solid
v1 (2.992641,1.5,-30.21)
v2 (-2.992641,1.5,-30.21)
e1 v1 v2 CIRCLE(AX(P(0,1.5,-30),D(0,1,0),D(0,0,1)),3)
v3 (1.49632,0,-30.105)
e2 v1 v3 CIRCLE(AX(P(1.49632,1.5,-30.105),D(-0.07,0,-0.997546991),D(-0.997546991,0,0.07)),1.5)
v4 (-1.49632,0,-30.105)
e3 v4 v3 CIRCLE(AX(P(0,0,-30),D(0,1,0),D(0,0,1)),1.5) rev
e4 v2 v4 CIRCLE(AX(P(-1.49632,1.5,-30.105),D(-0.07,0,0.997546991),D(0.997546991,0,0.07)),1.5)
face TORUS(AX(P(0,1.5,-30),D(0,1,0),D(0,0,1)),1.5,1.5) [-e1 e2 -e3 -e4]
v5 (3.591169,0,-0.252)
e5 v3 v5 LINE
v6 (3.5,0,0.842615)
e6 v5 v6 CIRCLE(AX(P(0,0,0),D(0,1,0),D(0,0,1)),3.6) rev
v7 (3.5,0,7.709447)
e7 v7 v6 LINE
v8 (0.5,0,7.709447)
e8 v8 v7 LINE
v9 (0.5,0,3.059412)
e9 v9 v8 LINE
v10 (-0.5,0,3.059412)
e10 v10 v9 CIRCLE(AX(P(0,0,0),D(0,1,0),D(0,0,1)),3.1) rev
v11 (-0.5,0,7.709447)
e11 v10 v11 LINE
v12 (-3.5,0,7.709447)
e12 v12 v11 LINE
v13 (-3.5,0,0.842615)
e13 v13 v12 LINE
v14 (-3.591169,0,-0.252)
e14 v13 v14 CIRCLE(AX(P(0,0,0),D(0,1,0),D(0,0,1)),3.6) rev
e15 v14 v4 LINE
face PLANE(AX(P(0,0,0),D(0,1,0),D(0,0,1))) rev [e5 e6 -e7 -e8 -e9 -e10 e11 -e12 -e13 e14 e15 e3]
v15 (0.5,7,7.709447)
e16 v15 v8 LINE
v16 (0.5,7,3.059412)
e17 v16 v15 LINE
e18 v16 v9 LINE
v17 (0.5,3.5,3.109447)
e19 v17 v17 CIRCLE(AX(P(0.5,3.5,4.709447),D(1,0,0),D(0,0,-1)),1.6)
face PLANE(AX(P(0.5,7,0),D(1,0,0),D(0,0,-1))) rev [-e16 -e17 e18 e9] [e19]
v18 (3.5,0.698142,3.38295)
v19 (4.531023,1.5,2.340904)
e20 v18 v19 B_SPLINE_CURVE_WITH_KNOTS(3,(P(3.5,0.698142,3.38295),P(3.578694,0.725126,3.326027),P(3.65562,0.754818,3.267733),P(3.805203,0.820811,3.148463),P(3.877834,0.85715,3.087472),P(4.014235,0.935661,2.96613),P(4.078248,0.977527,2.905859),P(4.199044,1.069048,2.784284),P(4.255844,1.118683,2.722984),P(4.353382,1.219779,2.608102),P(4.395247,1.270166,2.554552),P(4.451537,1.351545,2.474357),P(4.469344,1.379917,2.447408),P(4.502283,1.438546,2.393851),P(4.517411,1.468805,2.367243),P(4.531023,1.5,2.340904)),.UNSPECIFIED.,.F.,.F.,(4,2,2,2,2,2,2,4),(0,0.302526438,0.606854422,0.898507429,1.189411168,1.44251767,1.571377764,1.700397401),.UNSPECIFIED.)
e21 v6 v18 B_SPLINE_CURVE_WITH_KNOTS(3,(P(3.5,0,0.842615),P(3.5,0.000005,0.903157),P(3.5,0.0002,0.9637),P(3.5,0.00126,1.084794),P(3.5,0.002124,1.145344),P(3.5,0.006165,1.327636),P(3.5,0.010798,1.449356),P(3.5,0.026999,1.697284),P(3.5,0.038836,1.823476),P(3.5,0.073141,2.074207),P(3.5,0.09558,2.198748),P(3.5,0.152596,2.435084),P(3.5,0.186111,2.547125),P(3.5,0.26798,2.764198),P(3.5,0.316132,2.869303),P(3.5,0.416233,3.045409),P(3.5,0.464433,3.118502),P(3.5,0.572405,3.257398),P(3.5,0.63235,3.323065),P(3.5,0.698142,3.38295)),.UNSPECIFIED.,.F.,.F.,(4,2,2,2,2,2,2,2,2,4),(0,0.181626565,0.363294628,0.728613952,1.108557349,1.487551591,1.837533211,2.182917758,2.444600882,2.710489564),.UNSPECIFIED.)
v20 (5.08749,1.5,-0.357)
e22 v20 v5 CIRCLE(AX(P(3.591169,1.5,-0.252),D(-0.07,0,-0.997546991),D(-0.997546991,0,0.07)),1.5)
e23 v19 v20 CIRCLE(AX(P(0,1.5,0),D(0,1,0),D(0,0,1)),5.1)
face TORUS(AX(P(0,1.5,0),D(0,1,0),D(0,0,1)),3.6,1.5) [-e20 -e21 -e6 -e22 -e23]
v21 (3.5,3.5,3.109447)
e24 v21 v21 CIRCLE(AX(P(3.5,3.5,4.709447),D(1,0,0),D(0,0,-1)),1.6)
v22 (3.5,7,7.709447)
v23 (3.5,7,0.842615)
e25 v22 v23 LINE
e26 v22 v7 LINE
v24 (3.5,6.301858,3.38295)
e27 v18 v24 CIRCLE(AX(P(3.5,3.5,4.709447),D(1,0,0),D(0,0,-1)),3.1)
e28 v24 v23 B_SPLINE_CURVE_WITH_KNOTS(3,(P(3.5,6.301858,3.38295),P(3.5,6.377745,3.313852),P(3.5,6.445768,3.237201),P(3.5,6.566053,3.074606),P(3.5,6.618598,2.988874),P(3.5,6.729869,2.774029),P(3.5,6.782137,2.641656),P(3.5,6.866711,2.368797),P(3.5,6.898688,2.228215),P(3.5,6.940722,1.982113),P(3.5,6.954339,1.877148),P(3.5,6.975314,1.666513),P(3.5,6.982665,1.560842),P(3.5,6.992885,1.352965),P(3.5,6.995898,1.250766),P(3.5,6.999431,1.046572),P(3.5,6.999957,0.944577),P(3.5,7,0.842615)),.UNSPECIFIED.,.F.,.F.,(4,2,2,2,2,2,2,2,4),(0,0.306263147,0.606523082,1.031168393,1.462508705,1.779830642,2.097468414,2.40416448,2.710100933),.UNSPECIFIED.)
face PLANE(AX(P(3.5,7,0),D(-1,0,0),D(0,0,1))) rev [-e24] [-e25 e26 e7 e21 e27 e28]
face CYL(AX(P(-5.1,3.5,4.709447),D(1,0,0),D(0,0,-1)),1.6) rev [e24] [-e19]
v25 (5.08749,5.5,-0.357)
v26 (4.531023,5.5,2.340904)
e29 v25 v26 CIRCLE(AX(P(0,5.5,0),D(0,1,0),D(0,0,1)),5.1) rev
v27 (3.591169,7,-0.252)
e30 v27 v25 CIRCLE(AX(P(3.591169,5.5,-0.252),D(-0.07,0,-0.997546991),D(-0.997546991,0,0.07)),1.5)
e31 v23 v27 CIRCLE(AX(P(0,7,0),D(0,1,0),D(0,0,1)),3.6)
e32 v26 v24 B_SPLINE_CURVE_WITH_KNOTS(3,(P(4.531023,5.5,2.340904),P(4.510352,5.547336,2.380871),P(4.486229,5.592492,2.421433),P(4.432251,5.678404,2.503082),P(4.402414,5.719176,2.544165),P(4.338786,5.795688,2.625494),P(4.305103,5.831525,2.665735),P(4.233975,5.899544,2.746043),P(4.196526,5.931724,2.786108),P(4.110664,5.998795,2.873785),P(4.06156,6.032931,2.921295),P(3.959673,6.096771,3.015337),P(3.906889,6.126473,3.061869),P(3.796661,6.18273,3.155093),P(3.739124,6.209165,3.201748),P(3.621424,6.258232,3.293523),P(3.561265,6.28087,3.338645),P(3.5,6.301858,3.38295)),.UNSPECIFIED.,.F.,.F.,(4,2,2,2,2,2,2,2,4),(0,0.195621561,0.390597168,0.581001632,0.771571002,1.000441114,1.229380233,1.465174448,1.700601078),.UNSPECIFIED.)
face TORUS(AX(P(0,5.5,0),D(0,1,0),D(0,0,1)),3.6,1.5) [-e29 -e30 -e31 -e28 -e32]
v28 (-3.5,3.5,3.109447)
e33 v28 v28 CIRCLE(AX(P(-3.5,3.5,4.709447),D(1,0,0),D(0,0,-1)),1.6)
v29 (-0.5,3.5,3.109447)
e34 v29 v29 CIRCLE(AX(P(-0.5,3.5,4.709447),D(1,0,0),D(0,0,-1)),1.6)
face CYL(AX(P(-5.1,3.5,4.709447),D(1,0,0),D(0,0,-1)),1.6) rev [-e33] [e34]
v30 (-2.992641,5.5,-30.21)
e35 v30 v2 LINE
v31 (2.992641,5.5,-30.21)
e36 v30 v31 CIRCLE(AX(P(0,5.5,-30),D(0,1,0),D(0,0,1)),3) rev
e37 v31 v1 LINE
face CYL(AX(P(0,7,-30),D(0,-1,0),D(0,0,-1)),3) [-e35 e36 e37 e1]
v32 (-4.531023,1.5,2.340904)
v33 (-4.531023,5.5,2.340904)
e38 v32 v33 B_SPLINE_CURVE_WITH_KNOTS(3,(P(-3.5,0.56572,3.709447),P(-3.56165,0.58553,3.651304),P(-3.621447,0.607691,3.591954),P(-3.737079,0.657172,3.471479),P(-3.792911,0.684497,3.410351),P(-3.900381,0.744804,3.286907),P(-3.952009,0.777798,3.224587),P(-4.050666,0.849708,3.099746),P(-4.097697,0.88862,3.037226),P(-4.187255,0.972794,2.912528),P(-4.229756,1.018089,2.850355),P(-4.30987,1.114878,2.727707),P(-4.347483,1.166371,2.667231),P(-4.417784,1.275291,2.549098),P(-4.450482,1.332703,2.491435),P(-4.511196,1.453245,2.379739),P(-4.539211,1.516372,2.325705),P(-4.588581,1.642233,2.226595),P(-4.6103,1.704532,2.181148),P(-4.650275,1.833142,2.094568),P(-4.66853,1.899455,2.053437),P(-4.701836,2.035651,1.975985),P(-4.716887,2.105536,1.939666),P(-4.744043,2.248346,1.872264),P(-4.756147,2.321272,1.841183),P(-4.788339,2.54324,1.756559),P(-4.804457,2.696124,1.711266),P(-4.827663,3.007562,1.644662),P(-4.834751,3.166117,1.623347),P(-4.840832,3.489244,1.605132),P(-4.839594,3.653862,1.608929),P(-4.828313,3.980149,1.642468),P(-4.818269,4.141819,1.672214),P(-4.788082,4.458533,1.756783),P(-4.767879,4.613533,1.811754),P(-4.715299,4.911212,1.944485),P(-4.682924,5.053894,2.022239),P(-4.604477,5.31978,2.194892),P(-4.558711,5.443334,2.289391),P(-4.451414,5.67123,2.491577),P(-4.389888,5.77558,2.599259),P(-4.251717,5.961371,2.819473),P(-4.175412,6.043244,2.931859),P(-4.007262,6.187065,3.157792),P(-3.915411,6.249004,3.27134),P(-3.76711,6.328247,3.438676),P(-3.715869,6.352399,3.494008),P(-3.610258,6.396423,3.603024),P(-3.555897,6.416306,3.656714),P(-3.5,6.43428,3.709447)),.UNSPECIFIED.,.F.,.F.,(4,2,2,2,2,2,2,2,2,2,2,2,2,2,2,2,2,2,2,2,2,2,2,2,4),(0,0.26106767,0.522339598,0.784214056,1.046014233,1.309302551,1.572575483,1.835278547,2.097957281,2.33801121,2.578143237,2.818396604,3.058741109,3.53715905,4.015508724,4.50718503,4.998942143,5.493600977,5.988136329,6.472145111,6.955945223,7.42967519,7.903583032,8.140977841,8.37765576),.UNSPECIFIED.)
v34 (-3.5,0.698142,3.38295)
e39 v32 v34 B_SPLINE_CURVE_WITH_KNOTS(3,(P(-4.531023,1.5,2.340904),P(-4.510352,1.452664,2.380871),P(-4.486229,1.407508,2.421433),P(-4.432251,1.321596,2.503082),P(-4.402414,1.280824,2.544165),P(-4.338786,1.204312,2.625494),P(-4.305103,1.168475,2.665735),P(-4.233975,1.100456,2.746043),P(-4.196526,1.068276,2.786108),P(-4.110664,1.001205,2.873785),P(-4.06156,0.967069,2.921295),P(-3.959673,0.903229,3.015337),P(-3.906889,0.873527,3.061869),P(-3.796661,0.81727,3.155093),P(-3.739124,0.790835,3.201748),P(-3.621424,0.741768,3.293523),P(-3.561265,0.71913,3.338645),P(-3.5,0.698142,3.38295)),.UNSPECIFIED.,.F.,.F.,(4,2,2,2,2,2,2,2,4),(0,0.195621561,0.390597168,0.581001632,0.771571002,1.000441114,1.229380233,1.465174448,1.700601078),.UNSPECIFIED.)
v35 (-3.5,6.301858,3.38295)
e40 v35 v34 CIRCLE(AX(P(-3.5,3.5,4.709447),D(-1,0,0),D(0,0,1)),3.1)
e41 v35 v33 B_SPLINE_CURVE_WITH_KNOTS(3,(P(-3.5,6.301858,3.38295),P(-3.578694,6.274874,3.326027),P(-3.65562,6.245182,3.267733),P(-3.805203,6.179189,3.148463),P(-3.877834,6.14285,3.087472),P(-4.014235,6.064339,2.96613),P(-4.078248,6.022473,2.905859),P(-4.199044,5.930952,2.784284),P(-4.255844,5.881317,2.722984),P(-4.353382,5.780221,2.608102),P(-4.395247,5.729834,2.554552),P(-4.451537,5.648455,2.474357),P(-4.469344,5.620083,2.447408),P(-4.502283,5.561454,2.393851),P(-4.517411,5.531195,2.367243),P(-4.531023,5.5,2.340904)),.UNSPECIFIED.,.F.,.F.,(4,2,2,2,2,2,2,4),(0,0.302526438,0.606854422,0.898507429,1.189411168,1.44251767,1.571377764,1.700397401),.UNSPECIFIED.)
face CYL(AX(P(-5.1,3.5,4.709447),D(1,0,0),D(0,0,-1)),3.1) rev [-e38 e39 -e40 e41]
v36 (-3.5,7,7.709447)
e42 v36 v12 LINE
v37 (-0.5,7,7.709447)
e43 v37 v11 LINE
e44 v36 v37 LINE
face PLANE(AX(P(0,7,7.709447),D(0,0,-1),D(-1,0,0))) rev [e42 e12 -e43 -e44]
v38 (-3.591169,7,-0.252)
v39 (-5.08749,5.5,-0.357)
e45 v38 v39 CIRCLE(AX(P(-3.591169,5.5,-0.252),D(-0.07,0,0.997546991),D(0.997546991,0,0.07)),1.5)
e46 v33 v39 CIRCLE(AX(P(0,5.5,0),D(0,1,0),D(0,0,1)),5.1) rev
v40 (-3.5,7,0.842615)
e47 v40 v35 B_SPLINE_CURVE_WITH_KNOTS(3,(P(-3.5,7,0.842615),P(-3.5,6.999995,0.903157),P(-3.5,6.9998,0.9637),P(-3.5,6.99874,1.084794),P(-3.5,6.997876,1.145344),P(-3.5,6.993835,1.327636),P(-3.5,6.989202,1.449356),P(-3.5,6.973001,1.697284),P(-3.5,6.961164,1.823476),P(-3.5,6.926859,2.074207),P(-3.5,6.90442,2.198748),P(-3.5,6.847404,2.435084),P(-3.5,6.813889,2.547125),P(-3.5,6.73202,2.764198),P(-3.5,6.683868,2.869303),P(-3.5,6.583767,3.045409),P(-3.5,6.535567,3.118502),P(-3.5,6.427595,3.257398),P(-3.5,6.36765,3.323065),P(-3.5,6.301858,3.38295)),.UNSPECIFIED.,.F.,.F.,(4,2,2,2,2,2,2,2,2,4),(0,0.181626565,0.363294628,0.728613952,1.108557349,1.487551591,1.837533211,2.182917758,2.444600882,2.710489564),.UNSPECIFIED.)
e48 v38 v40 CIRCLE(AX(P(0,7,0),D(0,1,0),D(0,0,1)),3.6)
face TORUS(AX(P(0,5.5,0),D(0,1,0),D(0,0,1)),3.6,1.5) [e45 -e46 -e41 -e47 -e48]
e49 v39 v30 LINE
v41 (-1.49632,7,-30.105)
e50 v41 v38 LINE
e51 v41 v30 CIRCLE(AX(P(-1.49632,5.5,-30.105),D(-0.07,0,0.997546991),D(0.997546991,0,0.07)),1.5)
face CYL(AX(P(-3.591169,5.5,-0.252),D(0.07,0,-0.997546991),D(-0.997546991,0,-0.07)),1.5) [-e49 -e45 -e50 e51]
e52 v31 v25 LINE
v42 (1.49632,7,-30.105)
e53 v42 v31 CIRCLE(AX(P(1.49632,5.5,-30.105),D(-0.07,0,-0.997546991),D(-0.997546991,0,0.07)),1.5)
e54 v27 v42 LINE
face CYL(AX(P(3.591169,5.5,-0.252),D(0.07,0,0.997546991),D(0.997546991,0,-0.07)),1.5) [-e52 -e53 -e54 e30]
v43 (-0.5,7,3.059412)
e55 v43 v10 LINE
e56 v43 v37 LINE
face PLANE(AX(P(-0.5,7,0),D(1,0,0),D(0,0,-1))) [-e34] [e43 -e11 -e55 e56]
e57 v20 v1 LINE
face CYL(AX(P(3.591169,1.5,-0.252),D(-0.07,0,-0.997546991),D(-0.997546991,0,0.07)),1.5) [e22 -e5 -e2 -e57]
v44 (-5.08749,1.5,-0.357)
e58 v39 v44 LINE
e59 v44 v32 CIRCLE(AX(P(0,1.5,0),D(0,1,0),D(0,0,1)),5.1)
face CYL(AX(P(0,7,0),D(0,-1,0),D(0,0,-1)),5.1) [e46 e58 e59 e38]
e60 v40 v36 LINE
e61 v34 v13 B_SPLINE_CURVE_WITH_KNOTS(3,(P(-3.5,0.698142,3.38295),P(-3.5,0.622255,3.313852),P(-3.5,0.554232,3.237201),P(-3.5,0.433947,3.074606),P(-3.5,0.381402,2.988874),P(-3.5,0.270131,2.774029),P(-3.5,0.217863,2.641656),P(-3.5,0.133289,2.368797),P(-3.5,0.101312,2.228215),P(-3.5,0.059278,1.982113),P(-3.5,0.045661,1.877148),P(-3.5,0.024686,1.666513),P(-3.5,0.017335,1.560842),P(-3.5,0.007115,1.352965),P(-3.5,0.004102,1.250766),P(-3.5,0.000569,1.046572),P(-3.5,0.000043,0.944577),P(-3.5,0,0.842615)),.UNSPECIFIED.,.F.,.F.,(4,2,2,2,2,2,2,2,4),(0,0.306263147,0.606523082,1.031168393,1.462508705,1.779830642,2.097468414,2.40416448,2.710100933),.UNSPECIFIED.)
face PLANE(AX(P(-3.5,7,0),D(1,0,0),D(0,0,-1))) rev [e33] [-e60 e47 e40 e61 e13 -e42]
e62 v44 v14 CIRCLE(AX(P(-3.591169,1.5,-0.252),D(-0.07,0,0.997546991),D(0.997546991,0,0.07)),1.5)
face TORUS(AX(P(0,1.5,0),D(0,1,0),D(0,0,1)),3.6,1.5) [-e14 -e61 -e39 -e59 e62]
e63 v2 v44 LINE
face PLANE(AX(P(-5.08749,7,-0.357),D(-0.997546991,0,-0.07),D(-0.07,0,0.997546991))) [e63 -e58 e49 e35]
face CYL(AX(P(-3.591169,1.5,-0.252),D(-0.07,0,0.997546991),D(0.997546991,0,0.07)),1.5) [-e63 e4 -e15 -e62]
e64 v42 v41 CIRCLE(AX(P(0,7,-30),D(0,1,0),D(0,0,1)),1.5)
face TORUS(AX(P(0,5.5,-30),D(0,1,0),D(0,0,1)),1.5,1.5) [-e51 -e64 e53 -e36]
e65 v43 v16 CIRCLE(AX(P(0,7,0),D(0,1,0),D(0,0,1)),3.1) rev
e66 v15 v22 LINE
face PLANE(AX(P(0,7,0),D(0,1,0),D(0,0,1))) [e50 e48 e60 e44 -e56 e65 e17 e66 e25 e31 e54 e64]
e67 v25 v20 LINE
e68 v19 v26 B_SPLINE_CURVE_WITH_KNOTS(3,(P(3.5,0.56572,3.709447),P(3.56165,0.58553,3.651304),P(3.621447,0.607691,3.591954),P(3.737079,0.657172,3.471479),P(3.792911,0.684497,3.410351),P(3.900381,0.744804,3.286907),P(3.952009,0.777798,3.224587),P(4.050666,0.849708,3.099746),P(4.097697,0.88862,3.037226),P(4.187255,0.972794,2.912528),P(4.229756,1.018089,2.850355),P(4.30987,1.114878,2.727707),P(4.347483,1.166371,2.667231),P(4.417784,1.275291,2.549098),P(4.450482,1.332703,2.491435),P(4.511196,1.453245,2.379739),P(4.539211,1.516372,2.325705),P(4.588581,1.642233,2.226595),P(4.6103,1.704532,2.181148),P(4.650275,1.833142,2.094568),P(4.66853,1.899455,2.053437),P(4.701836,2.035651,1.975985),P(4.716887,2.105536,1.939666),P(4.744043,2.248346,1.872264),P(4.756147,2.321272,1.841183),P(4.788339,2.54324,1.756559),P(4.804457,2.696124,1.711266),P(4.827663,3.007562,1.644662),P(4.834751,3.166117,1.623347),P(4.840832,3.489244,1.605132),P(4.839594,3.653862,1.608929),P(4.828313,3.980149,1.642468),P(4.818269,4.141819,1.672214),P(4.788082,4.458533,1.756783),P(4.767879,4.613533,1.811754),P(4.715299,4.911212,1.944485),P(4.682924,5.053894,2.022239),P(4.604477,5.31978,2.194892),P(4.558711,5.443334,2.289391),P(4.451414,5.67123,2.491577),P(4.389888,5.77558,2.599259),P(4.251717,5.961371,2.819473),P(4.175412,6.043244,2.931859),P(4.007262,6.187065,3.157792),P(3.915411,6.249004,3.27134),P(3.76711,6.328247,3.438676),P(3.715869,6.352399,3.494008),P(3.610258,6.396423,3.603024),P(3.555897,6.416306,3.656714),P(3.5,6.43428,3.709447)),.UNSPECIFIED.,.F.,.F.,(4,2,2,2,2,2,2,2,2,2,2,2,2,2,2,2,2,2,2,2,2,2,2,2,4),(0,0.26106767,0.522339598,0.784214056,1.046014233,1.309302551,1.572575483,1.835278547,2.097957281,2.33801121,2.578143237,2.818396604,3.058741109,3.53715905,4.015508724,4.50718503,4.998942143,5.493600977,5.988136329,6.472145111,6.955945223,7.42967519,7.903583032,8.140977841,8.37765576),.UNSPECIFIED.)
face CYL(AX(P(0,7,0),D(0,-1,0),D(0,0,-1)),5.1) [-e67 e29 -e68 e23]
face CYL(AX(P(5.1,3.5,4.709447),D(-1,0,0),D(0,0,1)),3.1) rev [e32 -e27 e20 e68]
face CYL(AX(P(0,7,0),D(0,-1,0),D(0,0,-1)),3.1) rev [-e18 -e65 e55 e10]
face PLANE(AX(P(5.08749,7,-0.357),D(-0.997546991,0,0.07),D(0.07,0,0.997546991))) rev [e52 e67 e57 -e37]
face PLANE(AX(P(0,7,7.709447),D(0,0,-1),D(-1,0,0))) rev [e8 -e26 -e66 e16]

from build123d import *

# Parameters (mm, degrees)
BOSS_EXTRUDE1_DEPTH = 7
SKETCH2_R           = 1.6
CUT_EXTRUDE1_DEPTH  = 35.813215881
SKETCH3_R           = 3.1
CUT_EXTRUDE2_DEPTH  = 35.813215926
SKETCH4_R           = 3.1
CUT_EXTRUDE3_DEPTH  = 35.813215926
FILLET1_R           = 1.5


with BuildPart() as part:
    # Sketch1 → Boss-Extrude1 (new body)
    with BuildSketch(Plane(origin=(0, 0, 0), x_dir=(1, 0, 0), z_dir=(0, 1, 0))):
        with BuildLine():
            Line((3.5, -7.709447398), (3.5, -3.709447398))
            ThreePointArc((3.5, -3.709447398), (4.75081501, -1.85465812), (5.087489656, 0.357))
            Line((5.087489656, 0.357), (2.992640974, 30.21))
            ThreePointArc((2.992640974, 30.21), (0, 33), (-2.992640974, 30.21))
            Line((-2.992640974, 30.21), (-5.087489656, 0.357))
            ThreePointArc((-5.087489656, 0.357), (-4.75081501, -1.85465812), (-3.5, -3.709447398))
            Line((-3.5, -3.709447398), (-3.5, -7.709447398))
            Line((-3.5, -7.709447398), (-0.5, -7.709447398))
            Line((-0.5, -7.709447398), (-0.5, -3.059411708))
            ThreePointArc((-0.5, -3.059411708), (0, 3.1), (0.5, -3.059411708))
            Line((0.5, -3.059411708), (0.5, -7.709447398))
            Line((0.5, -7.709447398), (3.5, -7.709447398))
        make_face()
    extrude(amount=BOSS_EXTRUDE1_DEPTH)

    # Sketch2 → Cut-Extrude1 (cut, through all)
    with BuildSketch(Plane(origin=(3.5, 0, 0), x_dir=(0, 0, -1), z_dir=(1, 0, 0))):
        with Locations((-4.709447398, 3.5)):
            Circle(SKETCH2_R)
    extrude(amount=-CUT_EXTRUDE1_DEPTH, mode=Mode.SUBTRACT)

    # Sketch3 → Cut-Extrude2 (cut, through all)
    with BuildSketch(Plane(origin=(3.5, 0, 0), x_dir=(0, 0, -1), z_dir=(1, 0, 0))):
        with Locations((-4.709447398, 3.5)):
            Circle(SKETCH3_R)
    extrude(amount=CUT_EXTRUDE2_DEPTH, mode=Mode.SUBTRACT)

    # Sketch4 → Cut-Extrude3 (cut, through all)
    with BuildSketch(Plane.ZY.offset(3.5)):
        with Locations((4.709447398, 3.5)):
            Circle(SKETCH4_R)
    extrude(amount=CUT_EXTRUDE3_DEPTH, mode=Mode.SUBTRACT)

    # Fillet1
    # the kernel refuses this fillet: 1.5 mm, written as the material it takes off along each edge
    with BuildSketch(Plane(origin=(0, 0, 0), x_dir=(-0.9975469913743412, 0, -0.06999999999999885), z_dir=(0.06999999999999885, 0, -0.9975469913743412))) as fillet1_piece_1_section:
        with BuildLine():
            CenterArc((5.1 - FILLET1_R, FILLET1_R), FILLET1_R, 270, 90)
            Line((5.1 - FILLET1_R, 0), (5.1, 0))
            Line((5.1, 0), (5.1, FILLET1_R))
        make_face()
    fillet1_piece_1 = revolve(axis=Axis((0, 0, 0), (0, 1, 0)), revolution_arc=92.812679078, mode=Mode.PRIVATE)
    fillet1_piece_1 = split(fillet1_piece_1, bisect_by=Plane(origin=(-3.5, 0.37107605, 1.567580694), z_dir=(-1, 0, 0)), keep=Keep.TOP, mode=Mode.PRIVATE)
    add(fillet1_piece_1, mode=Mode.SUBTRACT)
    with BuildSketch(Plane(origin=(0, 0, 0), x_dir=(0.020965246222385766, 0, 0.9997802050705118), z_dir=(-0.9997802050705118, 0, 0.020965246222385766))) as fillet1_piece_2_section:
        with BuildLine():
            CenterArc((5.1 - FILLET1_R, FILLET1_R), FILLET1_R, 270, 90)
            Line((5.1, FILLET1_R), (5.1, 0))
            Line((5.1, 0), (5.1 - FILLET1_R, 0))
        make_face()
    fillet1_piece_2 = revolve(axis=Axis((0, 0, 0), (0, 1, 0)), revolution_arc=92.812679078, mode=Mode.PRIVATE)
    fillet1_piece_2 = split(fillet1_piece_2, bisect_by=Plane(origin=(3.5, 0.371076241, 1.567580599), z_dir=(1, 0, 0)), keep=Keep.TOP, mode=Mode.PRIVATE)
    add(fillet1_piece_2, mode=Mode.SUBTRACT)
    with BuildSketch(Plane(origin=(5.087489656, 0, -0.357), x_dir=(0, 1, 0), z_dir=(-0.06999999999999998, 0, -0.9975469913743412)), Plane(origin=(-2.992640974, 0, -30.21), x_dir=(0, 1, 0), z_dir=(-0.06999999999999998, 0, 0.9975469913743412)), Plane(origin=(-2.992640974, 7, -30.21), x_dir=(0.9975469913743412, 0, 0.06999999999999998), z_dir=(-0.06999999999999998, 0, 0.9975469913743412))) as fillet1_piece_3:
        with BuildLine():
            CenterArc((FILLET1_R, -FILLET1_R), FILLET1_R, 90, 90)
            Line((0, -FILLET1_R), (0, 0))
            Line((0, 0), (FILLET1_R, 0))
        make_face()
    extrude(amount=29.926409741, mode=Mode.SUBTRACT)
    with BuildSketch(Plane(origin=(0, 0, -30), x_dir=(0.9975469913743412, 0, -0.07000000000000023), z_dir=(0.07000000000000023, 0, 0.9975469913743412))) as fillet1_piece_4:
        with BuildLine():
            CenterArc((3 - FILLET1_R, FILLET1_R), FILLET1_R, 270, 90)
            Line((3, FILLET1_R), (3, 0))
            Line((3, 0), (3 - FILLET1_R, 0))
        make_face()
    revolve(axis=Axis((0, 0, -30), (0, 1, 0)), revolution_arc=171.972025564, mode=Mode.SUBTRACT)
    with BuildSketch(Plane(origin=(0, 7, 0), x_dir=(-0.9975469913743412, 0, -0.06999999999999885), z_dir=(0.06999999999999885, 0, -0.9975469913743412))) as fillet1_piece_5_section:
        with BuildLine():
            CenterArc((5.1 - FILLET1_R, -FILLET1_R), FILLET1_R, 0, 90)
            Line((5.1, -FILLET1_R), (5.1, 0))
            Line((5.1, 0), (5.1 - FILLET1_R, 0))
        make_face()
    fillet1_piece_5 = revolve(axis=Axis((0, 7, 0), (0, 1, 0)), revolution_arc=92.812679078, mode=Mode.PRIVATE)
    fillet1_piece_5 = split(fillet1_piece_5, bisect_by=Plane(origin=(-3.5, 6.628923944, 1.567580643), z_dir=(-1, 0, 0)), keep=Keep.TOP, mode=Mode.PRIVATE)
    add(fillet1_piece_5, mode=Mode.SUBTRACT)
    with BuildSketch(Plane(origin=(0, 7, 0), x_dir=(0.020965246222385686, 0, 0.9997802050705119), z_dir=(-0.9997802050705119, 0, 0.020965246222385686))) as fillet1_piece_6_section:
        with BuildLine():
            CenterArc((5.1 - FILLET1_R, -FILLET1_R), FILLET1_R, 0, 90)
            Line((5.1, -FILLET1_R), (5.1, 0))
            Line((5.1, 0), (5.1 - FILLET1_R, 0))
        make_face()
    fillet1_piece_6 = revolve(axis=Axis((0, 7, 0), (0, 1, 0)), revolution_arc=92.812679078, mode=Mode.PRIVATE)
    fillet1_piece_6 = split(fillet1_piece_6, bisect_by=Plane(origin=(3.5, 6.628923759, 1.567580599), z_dir=(1, 0, 0)), keep=Keep.TOP, mode=Mode.PRIVATE)
    add(fillet1_piece_6, mode=Mode.SUBTRACT)
    with BuildSketch(Plane(origin=(0, 7, -30), x_dir=(0.9975469913743412, 0, -0.07000000000000023), z_dir=(0.07000000000000023, 0, 0.9975469913743412))) as fillet1_piece_7:
        with BuildLine():
            CenterArc((3 - FILLET1_R, -FILLET1_R), FILLET1_R, 0, 90)
            Line((3, -FILLET1_R), (3, 0))
            Line((3, 0), (3 - FILLET1_R, 0))
        make_face()
    revolve(axis=Axis((0, 7, -30), (0, 1, 0)), revolution_arc=171.972025564, mode=Mode.SUBTRACT)
    with BuildSketch(Plane(origin=(5.087489656, 7, -0.357), x_dir=(0, -1, 0), z_dir=(-0.06999999999999998, 0, -0.9975469913743412))) as fillet1_piece_8:
        with BuildLine():
            CenterArc((FILLET1_R, FILLET1_R), FILLET1_R, 180, 90)
            Line((0, FILLET1_R), (0, 0))
            Line((0, 0), (FILLET1_R, 0))
        make_face()
    extrude(amount=29.926409741, mode=Mode.SUBTRACT)


solid = part.part
